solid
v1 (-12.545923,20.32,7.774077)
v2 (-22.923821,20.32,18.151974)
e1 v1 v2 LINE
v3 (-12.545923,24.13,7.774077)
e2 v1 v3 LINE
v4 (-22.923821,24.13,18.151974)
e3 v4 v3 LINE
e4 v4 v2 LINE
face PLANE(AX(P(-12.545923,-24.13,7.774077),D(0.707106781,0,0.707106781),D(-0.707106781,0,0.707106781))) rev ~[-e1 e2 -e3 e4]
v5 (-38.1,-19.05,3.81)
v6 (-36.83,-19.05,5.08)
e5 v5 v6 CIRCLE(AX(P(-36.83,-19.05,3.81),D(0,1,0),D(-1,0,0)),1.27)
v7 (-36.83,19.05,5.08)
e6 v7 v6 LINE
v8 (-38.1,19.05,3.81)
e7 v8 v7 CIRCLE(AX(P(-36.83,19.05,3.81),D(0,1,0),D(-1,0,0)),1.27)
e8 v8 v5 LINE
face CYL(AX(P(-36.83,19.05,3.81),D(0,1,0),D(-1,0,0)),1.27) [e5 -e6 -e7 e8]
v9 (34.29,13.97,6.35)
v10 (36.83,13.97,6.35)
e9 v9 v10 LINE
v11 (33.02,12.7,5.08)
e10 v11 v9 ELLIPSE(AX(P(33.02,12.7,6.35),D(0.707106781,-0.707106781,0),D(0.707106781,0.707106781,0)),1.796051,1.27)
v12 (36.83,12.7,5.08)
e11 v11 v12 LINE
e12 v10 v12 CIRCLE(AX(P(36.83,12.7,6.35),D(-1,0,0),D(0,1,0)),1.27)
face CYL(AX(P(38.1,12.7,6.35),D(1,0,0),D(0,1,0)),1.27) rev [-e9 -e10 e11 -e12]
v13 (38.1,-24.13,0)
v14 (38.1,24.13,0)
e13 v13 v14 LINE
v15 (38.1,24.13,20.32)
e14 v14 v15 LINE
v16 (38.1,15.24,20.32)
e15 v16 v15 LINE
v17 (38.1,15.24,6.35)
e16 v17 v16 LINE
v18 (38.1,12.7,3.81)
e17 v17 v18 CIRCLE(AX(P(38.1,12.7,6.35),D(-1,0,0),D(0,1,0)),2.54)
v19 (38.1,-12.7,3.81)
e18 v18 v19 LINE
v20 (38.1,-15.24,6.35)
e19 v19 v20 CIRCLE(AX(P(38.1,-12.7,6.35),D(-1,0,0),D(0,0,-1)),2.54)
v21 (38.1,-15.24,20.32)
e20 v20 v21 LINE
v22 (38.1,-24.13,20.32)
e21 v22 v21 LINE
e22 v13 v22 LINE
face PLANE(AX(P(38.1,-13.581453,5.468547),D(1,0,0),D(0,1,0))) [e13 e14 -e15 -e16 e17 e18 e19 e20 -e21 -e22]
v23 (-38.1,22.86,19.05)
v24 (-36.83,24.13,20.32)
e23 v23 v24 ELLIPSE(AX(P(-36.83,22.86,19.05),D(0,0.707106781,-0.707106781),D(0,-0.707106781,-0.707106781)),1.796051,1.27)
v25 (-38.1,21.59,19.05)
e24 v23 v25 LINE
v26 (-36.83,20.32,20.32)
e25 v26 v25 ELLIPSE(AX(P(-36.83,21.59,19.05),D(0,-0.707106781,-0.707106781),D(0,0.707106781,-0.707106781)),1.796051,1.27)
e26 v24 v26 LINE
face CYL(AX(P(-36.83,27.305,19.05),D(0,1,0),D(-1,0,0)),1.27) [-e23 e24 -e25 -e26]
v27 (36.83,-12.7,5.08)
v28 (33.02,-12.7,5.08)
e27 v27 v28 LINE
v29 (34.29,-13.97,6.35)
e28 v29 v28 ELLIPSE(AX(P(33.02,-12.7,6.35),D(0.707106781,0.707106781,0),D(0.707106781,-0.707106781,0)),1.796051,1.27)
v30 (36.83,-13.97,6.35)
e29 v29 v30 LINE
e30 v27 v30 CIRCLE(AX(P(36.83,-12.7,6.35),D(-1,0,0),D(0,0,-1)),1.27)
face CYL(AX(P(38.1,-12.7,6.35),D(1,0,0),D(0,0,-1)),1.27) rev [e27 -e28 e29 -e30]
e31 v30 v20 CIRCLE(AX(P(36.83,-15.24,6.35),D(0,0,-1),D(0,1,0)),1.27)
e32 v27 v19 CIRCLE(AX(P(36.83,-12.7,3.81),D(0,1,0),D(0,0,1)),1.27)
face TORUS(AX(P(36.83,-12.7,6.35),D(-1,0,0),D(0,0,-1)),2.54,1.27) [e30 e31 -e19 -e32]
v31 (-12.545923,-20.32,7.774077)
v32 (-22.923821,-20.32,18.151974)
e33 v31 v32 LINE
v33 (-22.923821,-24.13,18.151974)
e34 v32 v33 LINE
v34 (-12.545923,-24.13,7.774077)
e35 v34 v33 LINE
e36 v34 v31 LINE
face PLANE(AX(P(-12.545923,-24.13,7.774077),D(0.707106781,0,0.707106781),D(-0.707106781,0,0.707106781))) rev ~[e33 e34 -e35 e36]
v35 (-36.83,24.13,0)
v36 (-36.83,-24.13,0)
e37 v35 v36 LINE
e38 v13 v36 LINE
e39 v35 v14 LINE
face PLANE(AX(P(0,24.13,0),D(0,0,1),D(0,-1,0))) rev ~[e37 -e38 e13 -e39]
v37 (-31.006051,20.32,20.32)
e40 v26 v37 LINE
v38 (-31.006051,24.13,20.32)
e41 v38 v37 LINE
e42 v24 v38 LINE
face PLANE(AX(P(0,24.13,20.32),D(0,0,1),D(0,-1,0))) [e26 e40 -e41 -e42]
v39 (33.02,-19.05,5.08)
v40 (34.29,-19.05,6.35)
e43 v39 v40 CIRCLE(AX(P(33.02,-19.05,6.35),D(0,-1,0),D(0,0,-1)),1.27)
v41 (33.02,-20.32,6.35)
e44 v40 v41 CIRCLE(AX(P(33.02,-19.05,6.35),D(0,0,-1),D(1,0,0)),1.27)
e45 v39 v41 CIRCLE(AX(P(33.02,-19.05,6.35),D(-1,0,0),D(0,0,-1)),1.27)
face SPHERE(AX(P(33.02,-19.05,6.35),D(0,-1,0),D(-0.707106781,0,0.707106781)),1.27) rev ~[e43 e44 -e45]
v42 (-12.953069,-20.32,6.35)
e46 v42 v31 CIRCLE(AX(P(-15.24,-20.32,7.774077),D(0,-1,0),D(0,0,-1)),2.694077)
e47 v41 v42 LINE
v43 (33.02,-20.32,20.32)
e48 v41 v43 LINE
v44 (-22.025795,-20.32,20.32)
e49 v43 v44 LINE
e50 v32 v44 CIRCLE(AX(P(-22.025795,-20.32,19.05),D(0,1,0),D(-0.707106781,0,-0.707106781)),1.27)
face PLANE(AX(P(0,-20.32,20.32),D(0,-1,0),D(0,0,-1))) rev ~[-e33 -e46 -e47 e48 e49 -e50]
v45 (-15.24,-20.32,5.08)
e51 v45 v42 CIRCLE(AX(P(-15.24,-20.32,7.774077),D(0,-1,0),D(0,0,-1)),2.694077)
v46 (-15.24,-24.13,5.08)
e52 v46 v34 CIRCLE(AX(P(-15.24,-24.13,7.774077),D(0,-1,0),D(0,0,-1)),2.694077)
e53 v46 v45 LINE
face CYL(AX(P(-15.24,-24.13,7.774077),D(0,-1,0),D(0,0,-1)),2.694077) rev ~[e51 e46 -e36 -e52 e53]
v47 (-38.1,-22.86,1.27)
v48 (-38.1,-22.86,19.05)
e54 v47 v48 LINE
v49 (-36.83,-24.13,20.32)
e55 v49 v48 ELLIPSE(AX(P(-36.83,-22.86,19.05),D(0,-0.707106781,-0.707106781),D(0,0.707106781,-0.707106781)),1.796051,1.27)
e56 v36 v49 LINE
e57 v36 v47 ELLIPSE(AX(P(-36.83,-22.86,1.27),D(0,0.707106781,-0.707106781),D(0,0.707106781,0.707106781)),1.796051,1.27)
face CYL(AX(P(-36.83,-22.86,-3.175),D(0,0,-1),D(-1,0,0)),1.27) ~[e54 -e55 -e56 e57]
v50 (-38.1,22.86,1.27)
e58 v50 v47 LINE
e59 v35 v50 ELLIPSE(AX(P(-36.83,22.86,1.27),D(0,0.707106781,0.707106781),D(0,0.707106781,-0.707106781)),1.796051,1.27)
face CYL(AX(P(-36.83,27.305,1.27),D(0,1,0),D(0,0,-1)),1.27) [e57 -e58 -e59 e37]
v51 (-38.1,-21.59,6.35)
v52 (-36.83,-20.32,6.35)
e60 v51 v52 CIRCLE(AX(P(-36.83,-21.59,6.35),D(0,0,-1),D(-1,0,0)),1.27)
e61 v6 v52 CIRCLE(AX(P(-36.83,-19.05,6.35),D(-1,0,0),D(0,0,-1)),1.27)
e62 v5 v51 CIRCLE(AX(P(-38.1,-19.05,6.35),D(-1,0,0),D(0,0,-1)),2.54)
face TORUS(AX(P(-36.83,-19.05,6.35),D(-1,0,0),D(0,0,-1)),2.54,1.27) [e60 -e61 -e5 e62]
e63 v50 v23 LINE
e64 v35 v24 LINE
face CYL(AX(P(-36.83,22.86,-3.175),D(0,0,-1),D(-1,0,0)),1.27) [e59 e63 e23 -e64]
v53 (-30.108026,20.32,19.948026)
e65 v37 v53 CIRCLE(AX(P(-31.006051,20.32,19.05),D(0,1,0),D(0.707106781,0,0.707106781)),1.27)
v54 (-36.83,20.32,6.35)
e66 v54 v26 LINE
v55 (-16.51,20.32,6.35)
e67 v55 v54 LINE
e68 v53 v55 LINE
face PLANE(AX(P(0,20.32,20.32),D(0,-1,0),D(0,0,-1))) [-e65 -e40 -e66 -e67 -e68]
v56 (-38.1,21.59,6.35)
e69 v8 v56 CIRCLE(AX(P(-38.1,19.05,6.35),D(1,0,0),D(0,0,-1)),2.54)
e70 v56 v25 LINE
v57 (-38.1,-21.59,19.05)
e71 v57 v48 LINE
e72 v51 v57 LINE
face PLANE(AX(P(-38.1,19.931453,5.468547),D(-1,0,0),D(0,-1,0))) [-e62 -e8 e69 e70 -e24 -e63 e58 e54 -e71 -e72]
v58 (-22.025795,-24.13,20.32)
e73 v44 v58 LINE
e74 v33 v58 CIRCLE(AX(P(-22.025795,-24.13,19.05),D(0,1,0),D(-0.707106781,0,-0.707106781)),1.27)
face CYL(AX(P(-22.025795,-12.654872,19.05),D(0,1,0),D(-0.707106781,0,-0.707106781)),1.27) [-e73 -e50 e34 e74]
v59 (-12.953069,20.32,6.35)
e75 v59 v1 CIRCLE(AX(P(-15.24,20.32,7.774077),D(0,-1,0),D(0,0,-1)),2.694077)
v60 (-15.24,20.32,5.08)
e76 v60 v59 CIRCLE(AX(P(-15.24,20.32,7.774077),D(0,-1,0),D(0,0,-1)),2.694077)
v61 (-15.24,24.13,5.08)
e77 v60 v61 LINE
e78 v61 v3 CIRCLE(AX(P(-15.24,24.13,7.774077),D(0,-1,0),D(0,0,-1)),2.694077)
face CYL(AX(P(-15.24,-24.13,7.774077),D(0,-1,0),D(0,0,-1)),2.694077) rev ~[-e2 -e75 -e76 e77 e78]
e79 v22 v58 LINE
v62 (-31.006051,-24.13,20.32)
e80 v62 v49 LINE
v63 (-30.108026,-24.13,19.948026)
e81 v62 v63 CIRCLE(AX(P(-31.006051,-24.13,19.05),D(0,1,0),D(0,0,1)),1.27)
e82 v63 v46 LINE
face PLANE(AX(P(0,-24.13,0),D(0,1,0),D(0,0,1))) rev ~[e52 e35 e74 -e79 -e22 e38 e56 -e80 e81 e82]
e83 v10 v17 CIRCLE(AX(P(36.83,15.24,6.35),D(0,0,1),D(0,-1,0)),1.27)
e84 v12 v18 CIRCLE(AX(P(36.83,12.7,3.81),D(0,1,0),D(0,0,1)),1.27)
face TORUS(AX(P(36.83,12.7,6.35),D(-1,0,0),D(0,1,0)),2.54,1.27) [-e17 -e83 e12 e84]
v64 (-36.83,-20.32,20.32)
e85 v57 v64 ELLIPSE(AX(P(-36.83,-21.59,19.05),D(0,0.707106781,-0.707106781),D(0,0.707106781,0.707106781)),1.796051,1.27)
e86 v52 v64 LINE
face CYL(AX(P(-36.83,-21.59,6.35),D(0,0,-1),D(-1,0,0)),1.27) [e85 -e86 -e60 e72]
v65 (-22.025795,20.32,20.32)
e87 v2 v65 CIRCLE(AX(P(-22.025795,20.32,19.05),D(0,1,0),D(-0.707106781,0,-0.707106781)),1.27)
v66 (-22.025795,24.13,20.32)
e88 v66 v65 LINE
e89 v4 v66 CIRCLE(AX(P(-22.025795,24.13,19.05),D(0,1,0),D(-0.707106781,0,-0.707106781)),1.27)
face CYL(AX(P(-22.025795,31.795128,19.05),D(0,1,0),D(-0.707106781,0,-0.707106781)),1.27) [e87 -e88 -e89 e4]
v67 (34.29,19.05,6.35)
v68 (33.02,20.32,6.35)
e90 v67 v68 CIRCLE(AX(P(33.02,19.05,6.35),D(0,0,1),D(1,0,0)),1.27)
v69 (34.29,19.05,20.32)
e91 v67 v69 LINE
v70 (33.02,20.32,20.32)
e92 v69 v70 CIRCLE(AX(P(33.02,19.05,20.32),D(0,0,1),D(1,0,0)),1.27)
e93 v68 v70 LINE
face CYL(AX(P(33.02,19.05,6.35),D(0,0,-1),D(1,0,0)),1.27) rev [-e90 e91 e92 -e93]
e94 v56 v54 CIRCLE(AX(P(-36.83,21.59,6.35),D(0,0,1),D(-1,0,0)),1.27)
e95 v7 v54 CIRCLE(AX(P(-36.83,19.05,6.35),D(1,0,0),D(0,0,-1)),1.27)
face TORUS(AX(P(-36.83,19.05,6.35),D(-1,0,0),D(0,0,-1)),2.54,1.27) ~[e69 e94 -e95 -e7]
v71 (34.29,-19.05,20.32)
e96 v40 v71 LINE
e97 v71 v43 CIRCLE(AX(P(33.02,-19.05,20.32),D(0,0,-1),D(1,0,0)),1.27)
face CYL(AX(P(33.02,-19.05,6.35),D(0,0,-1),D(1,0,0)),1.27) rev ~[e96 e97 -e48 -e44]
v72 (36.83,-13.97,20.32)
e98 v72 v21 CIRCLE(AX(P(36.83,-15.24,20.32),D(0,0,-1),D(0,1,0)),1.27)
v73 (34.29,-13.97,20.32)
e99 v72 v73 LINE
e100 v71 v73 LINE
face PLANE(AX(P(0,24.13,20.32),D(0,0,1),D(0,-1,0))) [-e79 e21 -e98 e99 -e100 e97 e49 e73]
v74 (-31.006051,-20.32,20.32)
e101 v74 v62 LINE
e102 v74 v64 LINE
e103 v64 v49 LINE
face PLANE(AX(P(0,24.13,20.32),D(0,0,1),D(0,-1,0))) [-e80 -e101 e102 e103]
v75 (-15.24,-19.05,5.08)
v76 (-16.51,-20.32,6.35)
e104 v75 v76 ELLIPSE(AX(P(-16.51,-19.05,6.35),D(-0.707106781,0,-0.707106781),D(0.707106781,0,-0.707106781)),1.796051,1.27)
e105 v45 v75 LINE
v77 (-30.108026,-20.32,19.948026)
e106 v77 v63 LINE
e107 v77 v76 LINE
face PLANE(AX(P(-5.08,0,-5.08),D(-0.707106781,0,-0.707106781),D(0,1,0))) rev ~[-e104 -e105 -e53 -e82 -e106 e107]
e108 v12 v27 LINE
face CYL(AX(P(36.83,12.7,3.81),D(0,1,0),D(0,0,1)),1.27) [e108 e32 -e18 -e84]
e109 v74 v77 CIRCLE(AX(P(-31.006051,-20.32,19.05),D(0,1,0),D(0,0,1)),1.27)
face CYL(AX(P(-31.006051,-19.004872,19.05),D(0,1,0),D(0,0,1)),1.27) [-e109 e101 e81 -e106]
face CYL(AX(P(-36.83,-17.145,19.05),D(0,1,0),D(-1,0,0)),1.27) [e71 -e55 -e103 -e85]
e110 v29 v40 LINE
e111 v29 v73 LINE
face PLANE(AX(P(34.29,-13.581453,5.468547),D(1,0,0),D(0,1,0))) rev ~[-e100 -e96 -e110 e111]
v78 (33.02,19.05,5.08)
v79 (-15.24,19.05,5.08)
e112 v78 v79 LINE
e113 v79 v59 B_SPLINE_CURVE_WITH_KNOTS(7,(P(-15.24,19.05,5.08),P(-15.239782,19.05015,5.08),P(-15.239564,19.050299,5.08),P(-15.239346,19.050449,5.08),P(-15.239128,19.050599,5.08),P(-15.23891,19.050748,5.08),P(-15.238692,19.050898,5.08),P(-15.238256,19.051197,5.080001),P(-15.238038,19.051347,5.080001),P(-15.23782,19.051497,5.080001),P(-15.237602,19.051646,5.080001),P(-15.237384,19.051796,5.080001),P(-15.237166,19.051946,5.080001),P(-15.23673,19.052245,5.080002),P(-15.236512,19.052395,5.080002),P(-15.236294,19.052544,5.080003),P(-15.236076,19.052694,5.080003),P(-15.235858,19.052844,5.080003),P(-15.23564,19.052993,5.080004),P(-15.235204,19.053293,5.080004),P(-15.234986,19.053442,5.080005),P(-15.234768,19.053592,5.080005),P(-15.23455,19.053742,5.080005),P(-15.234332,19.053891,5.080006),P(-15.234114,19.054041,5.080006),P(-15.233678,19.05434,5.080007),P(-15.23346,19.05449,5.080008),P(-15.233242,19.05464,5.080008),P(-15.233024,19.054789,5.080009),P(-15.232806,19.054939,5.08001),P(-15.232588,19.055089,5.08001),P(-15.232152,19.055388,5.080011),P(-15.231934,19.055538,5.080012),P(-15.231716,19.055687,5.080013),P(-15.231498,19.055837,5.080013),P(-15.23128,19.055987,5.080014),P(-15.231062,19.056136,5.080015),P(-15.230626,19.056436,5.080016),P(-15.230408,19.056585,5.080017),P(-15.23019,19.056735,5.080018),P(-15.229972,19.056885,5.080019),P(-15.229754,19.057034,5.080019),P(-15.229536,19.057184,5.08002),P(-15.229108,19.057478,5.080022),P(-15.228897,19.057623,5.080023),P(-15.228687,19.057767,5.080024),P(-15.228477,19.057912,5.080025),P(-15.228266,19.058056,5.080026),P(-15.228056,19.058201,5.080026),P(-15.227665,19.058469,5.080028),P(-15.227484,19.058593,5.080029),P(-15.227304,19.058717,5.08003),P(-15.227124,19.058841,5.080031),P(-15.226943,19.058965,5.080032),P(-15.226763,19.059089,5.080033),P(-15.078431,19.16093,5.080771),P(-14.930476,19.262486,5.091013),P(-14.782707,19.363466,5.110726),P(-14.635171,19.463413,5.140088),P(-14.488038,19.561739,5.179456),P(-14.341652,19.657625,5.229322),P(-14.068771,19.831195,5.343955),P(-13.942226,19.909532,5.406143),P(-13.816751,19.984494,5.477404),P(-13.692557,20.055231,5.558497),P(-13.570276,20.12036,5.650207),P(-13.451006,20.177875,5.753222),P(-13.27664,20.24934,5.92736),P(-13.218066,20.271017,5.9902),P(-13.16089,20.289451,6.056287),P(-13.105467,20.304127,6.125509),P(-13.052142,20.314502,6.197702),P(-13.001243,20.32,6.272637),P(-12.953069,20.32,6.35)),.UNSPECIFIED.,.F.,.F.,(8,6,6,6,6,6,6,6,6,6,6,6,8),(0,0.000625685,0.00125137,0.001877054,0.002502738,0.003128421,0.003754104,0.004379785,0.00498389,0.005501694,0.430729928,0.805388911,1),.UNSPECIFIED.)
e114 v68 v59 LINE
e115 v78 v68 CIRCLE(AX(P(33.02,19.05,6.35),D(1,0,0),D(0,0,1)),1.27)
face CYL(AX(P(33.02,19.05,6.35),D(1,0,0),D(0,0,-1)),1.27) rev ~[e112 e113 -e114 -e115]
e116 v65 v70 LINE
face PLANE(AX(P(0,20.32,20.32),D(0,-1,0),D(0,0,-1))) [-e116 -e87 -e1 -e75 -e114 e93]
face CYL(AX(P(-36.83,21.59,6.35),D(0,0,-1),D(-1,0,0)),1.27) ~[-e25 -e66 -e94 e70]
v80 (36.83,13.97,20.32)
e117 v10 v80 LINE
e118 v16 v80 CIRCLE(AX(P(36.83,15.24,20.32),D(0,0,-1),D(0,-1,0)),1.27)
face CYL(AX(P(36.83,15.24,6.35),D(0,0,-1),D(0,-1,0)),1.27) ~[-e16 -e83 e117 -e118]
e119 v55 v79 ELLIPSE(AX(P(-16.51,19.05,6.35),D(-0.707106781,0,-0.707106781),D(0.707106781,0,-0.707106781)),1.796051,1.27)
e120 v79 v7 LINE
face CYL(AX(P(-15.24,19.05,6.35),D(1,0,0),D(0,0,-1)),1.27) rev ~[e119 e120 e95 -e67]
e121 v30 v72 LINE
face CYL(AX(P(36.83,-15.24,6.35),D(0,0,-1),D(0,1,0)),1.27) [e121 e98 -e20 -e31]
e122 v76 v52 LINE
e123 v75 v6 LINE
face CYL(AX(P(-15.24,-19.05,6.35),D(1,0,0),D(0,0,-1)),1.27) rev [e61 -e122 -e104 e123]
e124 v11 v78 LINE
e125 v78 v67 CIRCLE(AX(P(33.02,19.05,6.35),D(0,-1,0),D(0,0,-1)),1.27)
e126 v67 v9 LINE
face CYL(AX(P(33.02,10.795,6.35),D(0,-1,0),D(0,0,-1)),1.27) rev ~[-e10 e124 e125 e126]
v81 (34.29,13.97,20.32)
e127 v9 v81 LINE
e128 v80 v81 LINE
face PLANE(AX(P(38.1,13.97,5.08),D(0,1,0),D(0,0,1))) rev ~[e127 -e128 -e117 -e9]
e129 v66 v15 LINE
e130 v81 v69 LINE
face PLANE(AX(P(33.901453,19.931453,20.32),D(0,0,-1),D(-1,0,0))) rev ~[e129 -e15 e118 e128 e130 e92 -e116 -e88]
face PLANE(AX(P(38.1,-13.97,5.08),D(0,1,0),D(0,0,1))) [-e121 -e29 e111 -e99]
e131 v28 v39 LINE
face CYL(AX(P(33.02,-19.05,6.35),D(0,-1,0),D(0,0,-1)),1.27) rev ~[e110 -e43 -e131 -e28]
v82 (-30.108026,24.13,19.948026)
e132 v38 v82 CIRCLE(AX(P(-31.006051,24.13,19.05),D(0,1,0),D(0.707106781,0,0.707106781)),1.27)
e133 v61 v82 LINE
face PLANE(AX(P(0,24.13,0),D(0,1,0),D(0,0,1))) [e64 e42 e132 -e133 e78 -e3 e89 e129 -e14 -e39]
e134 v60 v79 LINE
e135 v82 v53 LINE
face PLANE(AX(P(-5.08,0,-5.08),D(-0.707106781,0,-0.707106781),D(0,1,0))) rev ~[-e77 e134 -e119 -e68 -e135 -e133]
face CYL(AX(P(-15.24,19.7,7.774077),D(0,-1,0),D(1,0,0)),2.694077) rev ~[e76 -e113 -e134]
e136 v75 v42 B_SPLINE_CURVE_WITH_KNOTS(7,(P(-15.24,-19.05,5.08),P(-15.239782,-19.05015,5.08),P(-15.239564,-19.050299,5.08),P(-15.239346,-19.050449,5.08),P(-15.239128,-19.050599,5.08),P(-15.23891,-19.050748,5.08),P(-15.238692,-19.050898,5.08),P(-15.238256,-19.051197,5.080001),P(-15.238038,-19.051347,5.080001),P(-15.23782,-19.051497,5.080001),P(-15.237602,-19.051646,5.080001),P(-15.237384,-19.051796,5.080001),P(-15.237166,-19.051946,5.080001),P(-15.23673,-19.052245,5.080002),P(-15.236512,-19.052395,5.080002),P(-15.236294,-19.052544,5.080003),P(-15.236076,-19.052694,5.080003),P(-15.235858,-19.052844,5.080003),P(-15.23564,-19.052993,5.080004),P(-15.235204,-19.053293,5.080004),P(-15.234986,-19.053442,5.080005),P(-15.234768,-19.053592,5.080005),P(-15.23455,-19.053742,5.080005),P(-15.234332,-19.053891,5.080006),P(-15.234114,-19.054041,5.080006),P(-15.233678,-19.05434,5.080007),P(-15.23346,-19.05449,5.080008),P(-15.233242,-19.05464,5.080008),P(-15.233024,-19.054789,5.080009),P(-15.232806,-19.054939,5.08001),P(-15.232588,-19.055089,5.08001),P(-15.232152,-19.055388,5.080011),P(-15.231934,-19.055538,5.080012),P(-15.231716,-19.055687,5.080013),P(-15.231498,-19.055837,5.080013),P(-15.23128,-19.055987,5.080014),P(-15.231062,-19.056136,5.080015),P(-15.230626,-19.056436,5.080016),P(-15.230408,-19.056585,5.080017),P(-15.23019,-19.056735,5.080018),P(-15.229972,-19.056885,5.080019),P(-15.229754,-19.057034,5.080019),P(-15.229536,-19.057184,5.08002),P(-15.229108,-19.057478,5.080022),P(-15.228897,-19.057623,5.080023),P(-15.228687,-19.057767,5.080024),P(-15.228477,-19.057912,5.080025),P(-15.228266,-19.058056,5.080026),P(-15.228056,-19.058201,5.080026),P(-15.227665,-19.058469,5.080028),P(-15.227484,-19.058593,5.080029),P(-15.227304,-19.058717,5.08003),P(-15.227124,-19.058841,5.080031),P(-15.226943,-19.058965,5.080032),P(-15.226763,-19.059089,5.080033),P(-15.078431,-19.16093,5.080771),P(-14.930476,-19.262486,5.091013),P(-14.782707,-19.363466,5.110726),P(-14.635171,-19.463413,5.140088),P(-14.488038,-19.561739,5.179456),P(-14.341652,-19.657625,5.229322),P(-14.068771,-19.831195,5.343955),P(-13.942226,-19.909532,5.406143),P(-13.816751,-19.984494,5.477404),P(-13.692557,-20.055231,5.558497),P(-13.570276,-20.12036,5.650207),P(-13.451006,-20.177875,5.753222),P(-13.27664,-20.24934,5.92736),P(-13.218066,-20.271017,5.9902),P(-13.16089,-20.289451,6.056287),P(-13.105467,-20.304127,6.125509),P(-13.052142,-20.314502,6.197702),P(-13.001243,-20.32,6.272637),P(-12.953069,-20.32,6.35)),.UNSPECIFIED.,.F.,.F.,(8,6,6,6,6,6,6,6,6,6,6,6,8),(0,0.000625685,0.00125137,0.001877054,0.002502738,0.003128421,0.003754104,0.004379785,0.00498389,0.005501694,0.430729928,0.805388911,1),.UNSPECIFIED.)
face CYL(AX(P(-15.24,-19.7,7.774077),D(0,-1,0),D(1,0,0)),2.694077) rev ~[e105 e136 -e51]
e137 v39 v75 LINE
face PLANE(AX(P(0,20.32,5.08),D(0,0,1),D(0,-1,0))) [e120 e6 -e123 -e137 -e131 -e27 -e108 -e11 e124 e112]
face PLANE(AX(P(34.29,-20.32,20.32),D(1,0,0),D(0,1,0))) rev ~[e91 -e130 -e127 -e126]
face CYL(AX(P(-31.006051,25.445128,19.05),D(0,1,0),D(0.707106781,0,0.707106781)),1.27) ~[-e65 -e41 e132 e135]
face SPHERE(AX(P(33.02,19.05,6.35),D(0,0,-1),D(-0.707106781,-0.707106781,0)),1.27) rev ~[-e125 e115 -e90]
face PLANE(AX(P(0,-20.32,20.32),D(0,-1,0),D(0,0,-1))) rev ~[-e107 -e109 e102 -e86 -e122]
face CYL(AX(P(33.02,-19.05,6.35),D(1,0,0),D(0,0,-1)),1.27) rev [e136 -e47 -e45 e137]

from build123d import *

# Parameters (mm, degrees)
F1_DEPTH     = 20.32
F2_W         = 34.29
F2_H         = 20.32
F3_DEPTH     = 15.24
F4_DEPTH     = 38.1
F6_DEPTH     = 76.2
F7_W         = 27.94
F7_H         = 15.24
F8_DEPTH     = 25.4
F9_T1_DEPTH  = 3.81
F9_T3_DEPTH  = 5.08
F9_T5_DEPTH  = 5.08
F9_T7_DEPTH  = 13.97
F9_S11_W     = 1.2954
F9_S11_H     = 1.2954
F9_T12_DEPTH = 1.2954
F9_S17_W     = 1.2954
F9_S17_H     = 1.2954
F9_T18_DEPTH = 1.2954
F9_T24_DEPTH = 48.26
F9_S25_R     = 2.6940768363
F9_T26_DEPTH = 26
F9_T30_DEPTH = 22.86
F9_T35_DEPTH = 22.86
F9_T40_DEPTH = 48.26
F9_S41_R     = 2.6940768363
F9_T42_DEPTH = 26
F9_T47_DEPTH = 6.985
F9_T51_DEPTH = 8.255
F9_T58_DEPTH = 6.985
F9_T62_DEPTH = 8.255
F9_T65_DEPTH = 25.4
F9_T67_DEPTH = 38.1
F9_T69_DEPTH = 19.1402561211
F9_T71_DEPTH = 6.4402561211
F9_T73_DEPTH = 19.1402561211
F9_T75_DEPTH = 6.4402561211
F9_T77_DEPTH = 54.61
F9_T79_DEPTH = 26.67
F9_T81_DEPTH = 10.16
F9_T83_DEPTH = 17.145
F9_T85_DEPTH = 10.16
F9_T88_ANGLE = 90
F9_T90_ANGLE = 90
F9_T92_ANGLE = 90
F9_T94_ANGLE = 90


# Not quite as in the source:
# - a fillet or chamfer that OpenCascade refuses, or shapes differently, is made with other operations: its cross-section is extruded or revolved along the edge and cut away or added


with BuildPart() as f1:
    # F0 (on Top) → F1 (new body)
    with BuildSketch(Plane.XY):
        Polygon((0, 24.13), (0, 0), (0, -24.13), (38.1, -24.13), (38.1, 24.13), align=None)
    extrude(amount=F1_DEPTH)

    # F2 (on face) → F3 (cut)
    with BuildSketch(Plane.XY.offset(20.32)):
        with Locations((17.145, 10.16)):
            Rectangle(F2_W, F2_H)
        with Locations((17.145, -10.16)):
            Rectangle(F2_W, F2_H)
    extrude(amount=-F3_DEPTH, mode=Mode.SUBTRACT)

    # F4 (add): a face of the model
    f4_faces = [f1.faces().sort_by_distance(p)[0] for p in [
        (0, 0, 0.5236344145),
    ]]
    extrude(f4_faces, amount=F4_DEPTH)

    # F5 (on face) → F6 (cut)
    with BuildSketch(Plane.XZ.offset(24.13)):
        with BuildLine():
            Line((-25.0918463274, 20.32), (-30.48, 20.32))
            Line((-30.48, 20.32), (-15.24, 5.08))
            ThreePointArc((-15.24, 5.08), (-13.335, 5.8690768363), (-12.5459231637, 7.7740768363))
            Line((-12.5459231637, 7.7740768363), (-25.0918463274, 20.32))
        make_face()
    extrude(amount=-F6_DEPTH, mode=Mode.SUBTRACT)

    # F7 (on face) → F8 (cut)
    with BuildSketch(Plane.YZ.offset(38.1)):
        with Locations((0, 12.7)):
            Rectangle(F7_W, F7_H)
    extrude(amount=-F8_DEPTH, mode=Mode.SUBTRACT)

    # F9: fillet of radius 1.27 on 25 edges, made by hand

    # F9_s2 → F9_t1 (join)
    with BuildSketch(Plane.YZ.offset(34.29)):
        with BuildLine():
            ThreePointArc((-12.7, 5.08), (-13.5980256121, 5.4519743879), (-13.97, 6.35))
            Line((-13.97, 6.35), (-13.97, 5.08))
            Line((-13.97, 5.08), (-12.7, 5.08))
        make_face()
        with BuildLine():
            ThreePointArc((13.97, 6.35), (13.5980256121, 5.4519743879), (12.7, 5.08))
            Line((12.7, 5.08), (13.97, 5.08))
            Line((13.97, 5.08), (13.97, 6.35))
        make_face()
    extrude(amount=F9_T1_DEPTH)

    # F9_s4 → F9_t3 (join)
    with BuildSketch(Plane.XZ.offset(13.97)):
        with BuildLine():
            ThreePointArc((33.02, 5.08), (33.9180256121, 5.4519743879), (34.29, 6.35))
            Line((34.29, 6.35), (34.29, 5.08))
            Line((34.29, 5.08), (33.02, 5.08))
        make_face()
    extrude(amount=F9_T3_DEPTH)

    # F9_s6 → F9_t5 (join)
    with BuildSketch(Plane.XZ.offset(-19.05)):
        with BuildLine():
            ThreePointArc((33.02, 5.08), (33.9180256121, 5.4519743879), (34.29, 6.35))
            Line((34.29, 6.35), (34.29, 5.08))
            Line((34.29, 5.08), (33.02, 5.08))
        make_face()
    extrude(amount=F9_T5_DEPTH)

    # F9_s8 → F9_t7 (join)
    with BuildSketch(Plane.XY.offset(6.35)):
        with BuildLine():
            ThreePointArc((34.29, 19.05), (33.9180256121, 19.9480256121), (33.02, 20.32))
            Line((33.02, 20.32), (34.29, 20.32))
            Line((34.29, 20.32), (34.29, 19.05))
        make_face()
        with BuildLine():
            ThreePointArc((34.29, -19.05), (33.9180256121, -19.9480256121), (33.02, -20.32))
            Line((33.02, -20.32), (34.29, -20.32))
            Line((34.29, -20.32), (34.29, -19.05))
        make_face()
    extrude(amount=F9_T7_DEPTH)


with BuildPart() as f9_tool10:
    # F9_s11 → F9_t12 (new body)
    with BuildSketch(Plane.XZ.offset(19.05)):
        with Locations((33.6677, 5.7023)):
            Rectangle(F9_S11_W, F9_S11_H)
    extrude(amount=F9_T12_DEPTH)

    # F9_s13 → F9_t14 (revolve, cut)
    with BuildSketch(Plane(origin=(33.02, -19.05, 6.35), x_dir=(-0.7071067812, 0, 0.7071067812), z_dir=(0.7071067812, 0, 0.7071067812))):
        with BuildLine():
            ThreePointArc((0, -1.27), (1.27, 0), (0, 1.27))
            Line((0, 1.27), (0, -1.27))
        make_face()
    revolve(axis=Axis((33.02, -19.05, 6.35), (0, -1, 0)), mode=Mode.SUBTRACT)


with BuildPart() as f1_1:
    add(f1.part)

    # F9_t9: union F9_tool10
    add(f9_tool10.part)


with BuildPart() as f9_tool16:
    # F9_s17 → F9_t18 (new body)
    with BuildSketch(Plane.XY.offset(6.35)):
        with Locations((33.6677, 19.6977)):
            Rectangle(F9_S17_W, F9_S17_H)
    extrude(amount=-F9_T18_DEPTH)

    # F9_s19 → F9_t20 (revolve, cut)
    with BuildSketch(Plane(origin=(33.02, 19.05, 6.35), x_dir=(-0.7071067812, -0.7071067812, 0), z_dir=(0.7071067812, -0.7071067812, 0))):
        with BuildLine():
            ThreePointArc((0, -1.27), (1.27, 0), (0, 1.27))
            Line((0, 1.27), (0, -1.27))
        make_face()
    revolve(axis=Axis((33.02, 19.05, 6.35), (0, 0, -1)), mode=Mode.SUBTRACT)


with BuildPart() as f1_2:
    add(f1_1.part)

    # F9_t15: union F9_tool16
    add(f9_tool16.part)


with BuildPart() as f9_tool22:
    # F9_s23 → F9_t24 (new body)
    with BuildSketch(Plane.YZ.offset(33.02)):
        with BuildLine():
            ThreePointArc((-19.05, 5.08), (-19.9480256121, 5.4519743879), (-20.32, 6.35))
            Line((-20.32, 6.35), (-20.32, 5.08))
            Line((-20.32, 5.08), (-19.05, 5.08))
        make_face()
    extrude(amount=-F9_T24_DEPTH)

    # F9_s25 → F9_t26 (cut, symmetric)
    with BuildSketch(Plane.XZ.offset(19.7)):
        with Locations((-15.24, 7.7740768363)):
            Circle(F9_S25_R)
    extrude(amount=F9_T26_DEPTH, both=True, mode=Mode.SUBTRACT)


with BuildPart() as f1_3:
    add(f1_2.part)

    # F9_t21: union F9_tool22
    add(f9_tool22.part)


with BuildPart() as f9_tool28:
    # F9_s29 → F9_t30 (new body)
    with BuildSketch(Plane.YZ.offset(-15.24)):
        with BuildLine():
            ThreePointArc((-19.05, 5.08), (-19.9480256121, 5.4519743879), (-20.32, 6.35))
            Line((-20.32, 6.35), (-20.32, 5.08))
            Line((-20.32, 5.08), (-19.05, 5.08))
        make_face()
    extrude(amount=-F9_T30_DEPTH)

    split(bisect_by=Plane(origin=(-5.08, 0, -5.08), x_dir=(0, 1, 0), z_dir=(-0.7071067812, 0, -0.7071067812)), keep=Keep.TOP)


with BuildPart() as f1_4:
    add(f1_3.part)

    # F9_t27: union F9_tool28
    add(f9_tool28.part)


with BuildPart() as f9_tool33:
    # F9_s34 → F9_t35 (new body)
    with BuildSketch(Plane.YZ.offset(-15.24)):
        with BuildLine():
            ThreePointArc((19.05, 5.08), (19.9480256121, 5.4519743879), (20.32, 6.35))
            Line((20.32, 6.35), (20.32, 5.08))
            Line((20.32, 5.08), (19.05, 5.08))
        make_face()
    extrude(amount=-F9_T35_DEPTH)

    split(bisect_by=Plane(origin=(-5.08, 0, -5.08), x_dir=(0, 1, 0), z_dir=(-0.7071067812, 0, -0.7071067812)), keep=Keep.TOP)


with BuildPart() as f1_5:
    add(f1_4.part)

    # F9_t32: union F9_tool33
    add(f9_tool33.part)


with BuildPart() as f9_tool38:
    # F9_s39 → F9_t40 (new body)
    with BuildSketch(Plane.YZ.offset(33.02)):
        with BuildLine():
            ThreePointArc((19.05, 5.08), (19.9480256121, 5.4519743879), (20.32, 6.35))
            Line((20.32, 6.35), (20.32, 5.08))
            Line((20.32, 5.08), (19.05, 5.08))
        make_face()
    extrude(amount=-F9_T40_DEPTH)

    # F9_s41 → F9_t42 (cut, symmetric)
    with BuildSketch(Plane.XZ.offset(-19.7)):
        with Locations((-15.24, 7.7740768363)):
            Circle(F9_S41_R)
    extrude(amount=F9_T42_DEPTH, both=True, mode=Mode.SUBTRACT)


with BuildPart() as f1_6:
    add(f1_5.part)

    # F9_t37: union F9_tool38
    add(f9_tool38.part)


with BuildPart() as f9_tool45:
    # F9_s46 → F9_t47 (new body)
    with BuildSketch(Plane.YZ.offset(38.1)):
        with BuildLine():
            ThreePointArc((-12.7, 5.08), (-13.5980256121, 5.4519743879), (-13.97, 6.35))
            Line((-13.97, 6.35), (-13.97, 5.08))
            Line((-13.97, 5.08), (-12.7, 5.08))
        make_face()
    extrude(amount=-F9_T47_DEPTH)

    split(bisect_by=Plane.YZ.offset(34.29), keep=Keep.BOTTOM)


with BuildPart() as f9_tool49:
    # F9_s50 → F9_t51 (new body)
    with BuildSketch(Plane.XZ.offset(19.05)):
        with BuildLine():
            ThreePointArc((33.02, 5.08), (33.9180256121, 5.4519743879), (34.29, 6.35))
            Line((34.29, 6.35), (34.29, 5.08))
            Line((34.29, 5.08), (33.02, 5.08))
        make_face()
    extrude(amount=-F9_T51_DEPTH)

    split(bisect_by=Plane.XZ.offset(13.97), keep=Keep.BOTTOM)


with BuildPart() as f9_tool45_1:
    add(f9_tool45.part)

    # F9_t53: intersect F9_tool49
    add(f9_tool49.part, mode=Mode.INTERSECT)


with BuildPart() as f1_7:
    add(f1_6.part)

    # F9_t43: union F9_tool45
    add(f9_tool45_1.part)


with BuildPart() as f9_tool56:
    # F9_s57 → F9_t58 (new body)
    with BuildSketch(Plane.YZ.offset(38.1)):
        with BuildLine():
            ThreePointArc((13.97, 6.35), (13.5980256121, 5.4519743879), (12.7, 5.08))
            Line((12.7, 5.08), (13.97, 5.08))
            Line((13.97, 5.08), (13.97, 6.35))
        make_face()
    extrude(amount=-F9_T58_DEPTH)

    split(bisect_by=Plane.YZ.offset(34.29), keep=Keep.BOTTOM)


with BuildPart() as f9_tool60:
    # F9_s61 → F9_t62 (new body)
    with BuildSketch(Plane.XZ.offset(-10.795)):
        with BuildLine():
            ThreePointArc((33.02, 5.08), (33.9180256121, 5.4519743879), (34.29, 6.35))
            Line((34.29, 6.35), (34.29, 5.08))
            Line((34.29, 5.08), (33.02, 5.08))
        make_face()
    extrude(amount=-F9_T62_DEPTH)

    split(bisect_by=Plane.XZ.offset(-13.97), keep=Keep.TOP)


with BuildPart() as f9_tool56_1:
    add(f9_tool56.part)

    # F9_t64: intersect F9_tool60
    add(f9_tool60.part, mode=Mode.INTERSECT)


with BuildPart() as f1_8:
    add(f1_7.part)

    # F9_t54: union F9_tool56
    add(f9_tool56_1.part)

    # F9_s66 → F9_t65 (cut)
    with BuildSketch(Plane.XZ.offset(-12.7)):
        with BuildLine():
            ThreePointArc((36.83, 5.08), (37.7280256121, 4.7080256121), (38.1, 3.81))
            Line((38.1, 3.81), (38.1, 5.08))
            Line((38.1, 5.08), (36.83, 5.08))
        make_face()
    extrude(amount=F9_T65_DEPTH, mode=Mode.SUBTRACT)

    # F9_s68 → F9_t67 (cut)
    with BuildSketch(Plane.XZ.offset(-19.05)):
        with BuildLine():
            ThreePointArc((-38.1, 3.81), (-37.7280256121, 4.7080256121), (-36.83, 5.08))
            Line((-36.83, 5.08), (-38.1, 5.08))
            Line((-38.1, 5.08), (-38.1, 3.81))
        make_face()
    extrude(amount=F9_T67_DEPTH, mode=Mode.SUBTRACT)

    # F9_s70 → F9_t69 (cut)
    with BuildSketch(Plane.XZ.offset(-31.7951280605)):
        with BuildLine():
            ThreePointArc((-22.9238207153, 18.1519743879), (-23.1991221094, 19.5360079591), (-22.0257951031, 20.32))
            Line((-22.0257951031, 20.32), (-25.0918463274, 20.32))
            Line((-25.0918463274, 20.32), (-22.9238207153, 18.1519743879))
        make_face()
    extrude(amount=F9_T69_DEPTH, mode=Mode.SUBTRACT)

    # F9_s72 → F9_t71 (cut)
    with BuildSketch(Plane.XZ.offset(-25.4451280605)):
        with BuildLine():
            ThreePointArc((-30.1080256121, 19.9480256121), (-30.5200432651, 20.2233270063), (-31.0060512242, 20.32))
            Line((-31.0060512242, 20.32), (-30.48, 20.32))
            Line((-30.48, 20.32), (-30.1080256121, 19.9480256121))
        make_face()
    extrude(amount=F9_T71_DEPTH, mode=Mode.SUBTRACT)

    # F9_s74 → F9_t73 (cut)
    with BuildSketch(Plane.XZ.offset(12.6548719395)):
        with BuildLine():
            ThreePointArc((-22.9238207153, 18.1519743879), (-23.1991221094, 19.5360079591), (-22.0257951031, 20.32))
            Line((-22.0257951031, 20.32), (-25.0918463274, 20.32))
            Line((-25.0918463274, 20.32), (-22.9238207153, 18.1519743879))
        make_face()
    extrude(amount=F9_T73_DEPTH, mode=Mode.SUBTRACT)

    # F9_s76 → F9_t75 (cut)
    with BuildSketch(Plane.XZ.offset(19.0048719395)):
        with BuildLine():
            ThreePointArc((-31.0060512242, 20.32), (-30.5200432651, 20.2233270063), (-30.1080256121, 19.9480256121))
            Line((-30.1080256121, 19.9480256121), (-30.48, 20.32))
            Line((-30.48, 20.32), (-31.0060512242, 20.32))
        make_face()
    extrude(amount=F9_T75_DEPTH, mode=Mode.SUBTRACT)

    # F9_s78 → F9_t77 (cut)
    with BuildSketch(Plane.XZ.offset(-27.305)):
        with BuildLine():
            ThreePointArc((-36.83, 0), (-37.7280256121, 0.3719743879), (-38.1, 1.27))
            Line((-38.1, 1.27), (-38.1, 0))
            Line((-38.1, 0), (-36.83, 0))
        make_face()
    extrude(amount=F9_T77_DEPTH, mode=Mode.SUBTRACT)

    # F9_s80 → F9_t79 (cut)
    with BuildSketch(Plane.XY.offset(-3.175)):
        with BuildLine():
            ThreePointArc((-38.1, -22.86), (-37.7280256121, -23.7580256121), (-36.83, -24.13))
            Line((-36.83, -24.13), (-38.1, -24.13))
            Line((-38.1, -24.13), (-38.1, -22.86))
        make_face()
        with BuildLine():
            ThreePointArc((-38.1, 22.86), (-37.7280256121, 23.7580256121), (-36.83, 24.13))
            Line((-36.83, 24.13), (-38.1, 24.13))
            Line((-38.1, 24.13), (-38.1, 22.86))
        make_face()
    extrude(amount=F9_T79_DEPTH, mode=Mode.SUBTRACT)

    # F9_s82 → F9_t81 (cut)
    with BuildSketch(Plane.XZ.offset(17.145)):
        with BuildLine():
            ThreePointArc((-38.1, 19.05), (-37.7280256121, 19.9480256121), (-36.83, 20.32))
            Line((-36.83, 20.32), (-38.1, 20.32))
            Line((-38.1, 20.32), (-38.1, 19.05))
        make_face()
    extrude(amount=F9_T81_DEPTH, mode=Mode.SUBTRACT)

    # F9_s84 → F9_t83 (cut)
    with BuildSketch(Plane.XY.offset(6.35)):
        with BuildLine():
            ThreePointArc((-38.1, -21.59), (-37.7280256121, -20.6919743879), (-36.83, -20.32))
            Line((-36.83, -20.32), (-38.1, -20.32))
            Line((-38.1, -20.32), (-38.1, -21.59))
        make_face()
        with BuildLine():
            ThreePointArc((-38.1, 21.59), (-37.7280256121, 20.6919743879), (-36.83, 20.32))
            Line((-36.83, 20.32), (-38.1, 20.32))
            Line((-38.1, 20.32), (-38.1, 21.59))
        make_face()
        with BuildLine():
            ThreePointArc((36.83, 13.97), (37.7280256121, 14.3419743879), (38.1, 15.24))
            Line((38.1, 15.24), (38.1, 13.97))
            Line((38.1, 13.97), (36.83, 13.97))
        make_face()
        with BuildLine():
            ThreePointArc((36.83, -13.97), (37.7280256121, -14.3419743879), (38.1, -15.24))
            Line((38.1, -15.24), (38.1, -13.97))
            Line((38.1, -13.97), (36.83, -13.97))
        make_face()
    extrude(amount=F9_T83_DEPTH, mode=Mode.SUBTRACT)

    # F9_s86 → F9_t85 (cut)
    with BuildSketch(Plane.XZ.offset(-27.305)):
        with BuildLine():
            ThreePointArc((-38.1, 19.05), (-37.7280256121, 19.9480256121), (-36.83, 20.32))
            Line((-36.83, 20.32), (-38.1, 20.32))
            Line((-38.1, 20.32), (-38.1, 19.05))
        make_face()
    extrude(amount=F9_T85_DEPTH, mode=Mode.SUBTRACT)

    # F9_s87 → F9_t88 (revolve, cut)
    with BuildSketch(Plane.XZ.offset(12.7)):
        with BuildLine():
            ThreePointArc((36.83, 5.08), (37.7280256121, 4.7080256121), (38.1, 3.81))
            Line((38.1, 3.81), (38.1, 5.08))
            Line((38.1, 5.08), (36.83, 5.08))
        make_face()
    revolve(axis=Axis((38.1, -12.7, 6.35), (-1, 0, 0)), revolution_arc=F9_T88_ANGLE, mode=Mode.SUBTRACT)

    # F9_s89 → F9_t90 (revolve, cut)
    with BuildSketch(Plane.XY.offset(6.35)):
        with BuildLine():
            ThreePointArc((36.83, 13.97), (37.7280256121, 14.3419743879), (38.1, 15.24))
            Line((38.1, 15.24), (38.1, 13.97))
            Line((38.1, 13.97), (36.83, 13.97))
        make_face()
    revolve(axis=Axis((38.1, 12.7, 6.35), (-1, 0, 0)), revolution_arc=F9_T90_ANGLE, mode=Mode.SUBTRACT)

    # F9_s91 → F9_t92 (revolve, cut)
    with BuildSketch(Plane.XZ.offset(-19.05)):
        with BuildLine():
            ThreePointArc((-38.1, 3.81), (-37.7280256121, 4.7080256121), (-36.83, 5.08))
            Line((-36.83, 5.08), (-38.1, 5.08))
            Line((-38.1, 5.08), (-38.1, 3.81))
        make_face()
    revolve(axis=Axis((-38.1, 19.05, 6.35), (1, 0, 0)), revolution_arc=F9_T92_ANGLE, mode=Mode.SUBTRACT)

    # F9_s93 → F9_t94 (revolve, cut)
    with BuildSketch(Plane.XZ.offset(19.05)):
        with BuildLine():
            ThreePointArc((-38.1, 3.81), (-37.7280256121, 4.7080256121), (-36.83, 5.08))
            Line((-36.83, 5.08), (-38.1, 5.08))
            Line((-38.1, 5.08), (-38.1, 3.81))
        make_face()
    revolve(axis=Axis((-38.1, -19.05, 6.35), (-1, 0, 0)), revolution_arc=F9_T94_ANGLE, mode=Mode.SUBTRACT)


solid = f1_8.part
